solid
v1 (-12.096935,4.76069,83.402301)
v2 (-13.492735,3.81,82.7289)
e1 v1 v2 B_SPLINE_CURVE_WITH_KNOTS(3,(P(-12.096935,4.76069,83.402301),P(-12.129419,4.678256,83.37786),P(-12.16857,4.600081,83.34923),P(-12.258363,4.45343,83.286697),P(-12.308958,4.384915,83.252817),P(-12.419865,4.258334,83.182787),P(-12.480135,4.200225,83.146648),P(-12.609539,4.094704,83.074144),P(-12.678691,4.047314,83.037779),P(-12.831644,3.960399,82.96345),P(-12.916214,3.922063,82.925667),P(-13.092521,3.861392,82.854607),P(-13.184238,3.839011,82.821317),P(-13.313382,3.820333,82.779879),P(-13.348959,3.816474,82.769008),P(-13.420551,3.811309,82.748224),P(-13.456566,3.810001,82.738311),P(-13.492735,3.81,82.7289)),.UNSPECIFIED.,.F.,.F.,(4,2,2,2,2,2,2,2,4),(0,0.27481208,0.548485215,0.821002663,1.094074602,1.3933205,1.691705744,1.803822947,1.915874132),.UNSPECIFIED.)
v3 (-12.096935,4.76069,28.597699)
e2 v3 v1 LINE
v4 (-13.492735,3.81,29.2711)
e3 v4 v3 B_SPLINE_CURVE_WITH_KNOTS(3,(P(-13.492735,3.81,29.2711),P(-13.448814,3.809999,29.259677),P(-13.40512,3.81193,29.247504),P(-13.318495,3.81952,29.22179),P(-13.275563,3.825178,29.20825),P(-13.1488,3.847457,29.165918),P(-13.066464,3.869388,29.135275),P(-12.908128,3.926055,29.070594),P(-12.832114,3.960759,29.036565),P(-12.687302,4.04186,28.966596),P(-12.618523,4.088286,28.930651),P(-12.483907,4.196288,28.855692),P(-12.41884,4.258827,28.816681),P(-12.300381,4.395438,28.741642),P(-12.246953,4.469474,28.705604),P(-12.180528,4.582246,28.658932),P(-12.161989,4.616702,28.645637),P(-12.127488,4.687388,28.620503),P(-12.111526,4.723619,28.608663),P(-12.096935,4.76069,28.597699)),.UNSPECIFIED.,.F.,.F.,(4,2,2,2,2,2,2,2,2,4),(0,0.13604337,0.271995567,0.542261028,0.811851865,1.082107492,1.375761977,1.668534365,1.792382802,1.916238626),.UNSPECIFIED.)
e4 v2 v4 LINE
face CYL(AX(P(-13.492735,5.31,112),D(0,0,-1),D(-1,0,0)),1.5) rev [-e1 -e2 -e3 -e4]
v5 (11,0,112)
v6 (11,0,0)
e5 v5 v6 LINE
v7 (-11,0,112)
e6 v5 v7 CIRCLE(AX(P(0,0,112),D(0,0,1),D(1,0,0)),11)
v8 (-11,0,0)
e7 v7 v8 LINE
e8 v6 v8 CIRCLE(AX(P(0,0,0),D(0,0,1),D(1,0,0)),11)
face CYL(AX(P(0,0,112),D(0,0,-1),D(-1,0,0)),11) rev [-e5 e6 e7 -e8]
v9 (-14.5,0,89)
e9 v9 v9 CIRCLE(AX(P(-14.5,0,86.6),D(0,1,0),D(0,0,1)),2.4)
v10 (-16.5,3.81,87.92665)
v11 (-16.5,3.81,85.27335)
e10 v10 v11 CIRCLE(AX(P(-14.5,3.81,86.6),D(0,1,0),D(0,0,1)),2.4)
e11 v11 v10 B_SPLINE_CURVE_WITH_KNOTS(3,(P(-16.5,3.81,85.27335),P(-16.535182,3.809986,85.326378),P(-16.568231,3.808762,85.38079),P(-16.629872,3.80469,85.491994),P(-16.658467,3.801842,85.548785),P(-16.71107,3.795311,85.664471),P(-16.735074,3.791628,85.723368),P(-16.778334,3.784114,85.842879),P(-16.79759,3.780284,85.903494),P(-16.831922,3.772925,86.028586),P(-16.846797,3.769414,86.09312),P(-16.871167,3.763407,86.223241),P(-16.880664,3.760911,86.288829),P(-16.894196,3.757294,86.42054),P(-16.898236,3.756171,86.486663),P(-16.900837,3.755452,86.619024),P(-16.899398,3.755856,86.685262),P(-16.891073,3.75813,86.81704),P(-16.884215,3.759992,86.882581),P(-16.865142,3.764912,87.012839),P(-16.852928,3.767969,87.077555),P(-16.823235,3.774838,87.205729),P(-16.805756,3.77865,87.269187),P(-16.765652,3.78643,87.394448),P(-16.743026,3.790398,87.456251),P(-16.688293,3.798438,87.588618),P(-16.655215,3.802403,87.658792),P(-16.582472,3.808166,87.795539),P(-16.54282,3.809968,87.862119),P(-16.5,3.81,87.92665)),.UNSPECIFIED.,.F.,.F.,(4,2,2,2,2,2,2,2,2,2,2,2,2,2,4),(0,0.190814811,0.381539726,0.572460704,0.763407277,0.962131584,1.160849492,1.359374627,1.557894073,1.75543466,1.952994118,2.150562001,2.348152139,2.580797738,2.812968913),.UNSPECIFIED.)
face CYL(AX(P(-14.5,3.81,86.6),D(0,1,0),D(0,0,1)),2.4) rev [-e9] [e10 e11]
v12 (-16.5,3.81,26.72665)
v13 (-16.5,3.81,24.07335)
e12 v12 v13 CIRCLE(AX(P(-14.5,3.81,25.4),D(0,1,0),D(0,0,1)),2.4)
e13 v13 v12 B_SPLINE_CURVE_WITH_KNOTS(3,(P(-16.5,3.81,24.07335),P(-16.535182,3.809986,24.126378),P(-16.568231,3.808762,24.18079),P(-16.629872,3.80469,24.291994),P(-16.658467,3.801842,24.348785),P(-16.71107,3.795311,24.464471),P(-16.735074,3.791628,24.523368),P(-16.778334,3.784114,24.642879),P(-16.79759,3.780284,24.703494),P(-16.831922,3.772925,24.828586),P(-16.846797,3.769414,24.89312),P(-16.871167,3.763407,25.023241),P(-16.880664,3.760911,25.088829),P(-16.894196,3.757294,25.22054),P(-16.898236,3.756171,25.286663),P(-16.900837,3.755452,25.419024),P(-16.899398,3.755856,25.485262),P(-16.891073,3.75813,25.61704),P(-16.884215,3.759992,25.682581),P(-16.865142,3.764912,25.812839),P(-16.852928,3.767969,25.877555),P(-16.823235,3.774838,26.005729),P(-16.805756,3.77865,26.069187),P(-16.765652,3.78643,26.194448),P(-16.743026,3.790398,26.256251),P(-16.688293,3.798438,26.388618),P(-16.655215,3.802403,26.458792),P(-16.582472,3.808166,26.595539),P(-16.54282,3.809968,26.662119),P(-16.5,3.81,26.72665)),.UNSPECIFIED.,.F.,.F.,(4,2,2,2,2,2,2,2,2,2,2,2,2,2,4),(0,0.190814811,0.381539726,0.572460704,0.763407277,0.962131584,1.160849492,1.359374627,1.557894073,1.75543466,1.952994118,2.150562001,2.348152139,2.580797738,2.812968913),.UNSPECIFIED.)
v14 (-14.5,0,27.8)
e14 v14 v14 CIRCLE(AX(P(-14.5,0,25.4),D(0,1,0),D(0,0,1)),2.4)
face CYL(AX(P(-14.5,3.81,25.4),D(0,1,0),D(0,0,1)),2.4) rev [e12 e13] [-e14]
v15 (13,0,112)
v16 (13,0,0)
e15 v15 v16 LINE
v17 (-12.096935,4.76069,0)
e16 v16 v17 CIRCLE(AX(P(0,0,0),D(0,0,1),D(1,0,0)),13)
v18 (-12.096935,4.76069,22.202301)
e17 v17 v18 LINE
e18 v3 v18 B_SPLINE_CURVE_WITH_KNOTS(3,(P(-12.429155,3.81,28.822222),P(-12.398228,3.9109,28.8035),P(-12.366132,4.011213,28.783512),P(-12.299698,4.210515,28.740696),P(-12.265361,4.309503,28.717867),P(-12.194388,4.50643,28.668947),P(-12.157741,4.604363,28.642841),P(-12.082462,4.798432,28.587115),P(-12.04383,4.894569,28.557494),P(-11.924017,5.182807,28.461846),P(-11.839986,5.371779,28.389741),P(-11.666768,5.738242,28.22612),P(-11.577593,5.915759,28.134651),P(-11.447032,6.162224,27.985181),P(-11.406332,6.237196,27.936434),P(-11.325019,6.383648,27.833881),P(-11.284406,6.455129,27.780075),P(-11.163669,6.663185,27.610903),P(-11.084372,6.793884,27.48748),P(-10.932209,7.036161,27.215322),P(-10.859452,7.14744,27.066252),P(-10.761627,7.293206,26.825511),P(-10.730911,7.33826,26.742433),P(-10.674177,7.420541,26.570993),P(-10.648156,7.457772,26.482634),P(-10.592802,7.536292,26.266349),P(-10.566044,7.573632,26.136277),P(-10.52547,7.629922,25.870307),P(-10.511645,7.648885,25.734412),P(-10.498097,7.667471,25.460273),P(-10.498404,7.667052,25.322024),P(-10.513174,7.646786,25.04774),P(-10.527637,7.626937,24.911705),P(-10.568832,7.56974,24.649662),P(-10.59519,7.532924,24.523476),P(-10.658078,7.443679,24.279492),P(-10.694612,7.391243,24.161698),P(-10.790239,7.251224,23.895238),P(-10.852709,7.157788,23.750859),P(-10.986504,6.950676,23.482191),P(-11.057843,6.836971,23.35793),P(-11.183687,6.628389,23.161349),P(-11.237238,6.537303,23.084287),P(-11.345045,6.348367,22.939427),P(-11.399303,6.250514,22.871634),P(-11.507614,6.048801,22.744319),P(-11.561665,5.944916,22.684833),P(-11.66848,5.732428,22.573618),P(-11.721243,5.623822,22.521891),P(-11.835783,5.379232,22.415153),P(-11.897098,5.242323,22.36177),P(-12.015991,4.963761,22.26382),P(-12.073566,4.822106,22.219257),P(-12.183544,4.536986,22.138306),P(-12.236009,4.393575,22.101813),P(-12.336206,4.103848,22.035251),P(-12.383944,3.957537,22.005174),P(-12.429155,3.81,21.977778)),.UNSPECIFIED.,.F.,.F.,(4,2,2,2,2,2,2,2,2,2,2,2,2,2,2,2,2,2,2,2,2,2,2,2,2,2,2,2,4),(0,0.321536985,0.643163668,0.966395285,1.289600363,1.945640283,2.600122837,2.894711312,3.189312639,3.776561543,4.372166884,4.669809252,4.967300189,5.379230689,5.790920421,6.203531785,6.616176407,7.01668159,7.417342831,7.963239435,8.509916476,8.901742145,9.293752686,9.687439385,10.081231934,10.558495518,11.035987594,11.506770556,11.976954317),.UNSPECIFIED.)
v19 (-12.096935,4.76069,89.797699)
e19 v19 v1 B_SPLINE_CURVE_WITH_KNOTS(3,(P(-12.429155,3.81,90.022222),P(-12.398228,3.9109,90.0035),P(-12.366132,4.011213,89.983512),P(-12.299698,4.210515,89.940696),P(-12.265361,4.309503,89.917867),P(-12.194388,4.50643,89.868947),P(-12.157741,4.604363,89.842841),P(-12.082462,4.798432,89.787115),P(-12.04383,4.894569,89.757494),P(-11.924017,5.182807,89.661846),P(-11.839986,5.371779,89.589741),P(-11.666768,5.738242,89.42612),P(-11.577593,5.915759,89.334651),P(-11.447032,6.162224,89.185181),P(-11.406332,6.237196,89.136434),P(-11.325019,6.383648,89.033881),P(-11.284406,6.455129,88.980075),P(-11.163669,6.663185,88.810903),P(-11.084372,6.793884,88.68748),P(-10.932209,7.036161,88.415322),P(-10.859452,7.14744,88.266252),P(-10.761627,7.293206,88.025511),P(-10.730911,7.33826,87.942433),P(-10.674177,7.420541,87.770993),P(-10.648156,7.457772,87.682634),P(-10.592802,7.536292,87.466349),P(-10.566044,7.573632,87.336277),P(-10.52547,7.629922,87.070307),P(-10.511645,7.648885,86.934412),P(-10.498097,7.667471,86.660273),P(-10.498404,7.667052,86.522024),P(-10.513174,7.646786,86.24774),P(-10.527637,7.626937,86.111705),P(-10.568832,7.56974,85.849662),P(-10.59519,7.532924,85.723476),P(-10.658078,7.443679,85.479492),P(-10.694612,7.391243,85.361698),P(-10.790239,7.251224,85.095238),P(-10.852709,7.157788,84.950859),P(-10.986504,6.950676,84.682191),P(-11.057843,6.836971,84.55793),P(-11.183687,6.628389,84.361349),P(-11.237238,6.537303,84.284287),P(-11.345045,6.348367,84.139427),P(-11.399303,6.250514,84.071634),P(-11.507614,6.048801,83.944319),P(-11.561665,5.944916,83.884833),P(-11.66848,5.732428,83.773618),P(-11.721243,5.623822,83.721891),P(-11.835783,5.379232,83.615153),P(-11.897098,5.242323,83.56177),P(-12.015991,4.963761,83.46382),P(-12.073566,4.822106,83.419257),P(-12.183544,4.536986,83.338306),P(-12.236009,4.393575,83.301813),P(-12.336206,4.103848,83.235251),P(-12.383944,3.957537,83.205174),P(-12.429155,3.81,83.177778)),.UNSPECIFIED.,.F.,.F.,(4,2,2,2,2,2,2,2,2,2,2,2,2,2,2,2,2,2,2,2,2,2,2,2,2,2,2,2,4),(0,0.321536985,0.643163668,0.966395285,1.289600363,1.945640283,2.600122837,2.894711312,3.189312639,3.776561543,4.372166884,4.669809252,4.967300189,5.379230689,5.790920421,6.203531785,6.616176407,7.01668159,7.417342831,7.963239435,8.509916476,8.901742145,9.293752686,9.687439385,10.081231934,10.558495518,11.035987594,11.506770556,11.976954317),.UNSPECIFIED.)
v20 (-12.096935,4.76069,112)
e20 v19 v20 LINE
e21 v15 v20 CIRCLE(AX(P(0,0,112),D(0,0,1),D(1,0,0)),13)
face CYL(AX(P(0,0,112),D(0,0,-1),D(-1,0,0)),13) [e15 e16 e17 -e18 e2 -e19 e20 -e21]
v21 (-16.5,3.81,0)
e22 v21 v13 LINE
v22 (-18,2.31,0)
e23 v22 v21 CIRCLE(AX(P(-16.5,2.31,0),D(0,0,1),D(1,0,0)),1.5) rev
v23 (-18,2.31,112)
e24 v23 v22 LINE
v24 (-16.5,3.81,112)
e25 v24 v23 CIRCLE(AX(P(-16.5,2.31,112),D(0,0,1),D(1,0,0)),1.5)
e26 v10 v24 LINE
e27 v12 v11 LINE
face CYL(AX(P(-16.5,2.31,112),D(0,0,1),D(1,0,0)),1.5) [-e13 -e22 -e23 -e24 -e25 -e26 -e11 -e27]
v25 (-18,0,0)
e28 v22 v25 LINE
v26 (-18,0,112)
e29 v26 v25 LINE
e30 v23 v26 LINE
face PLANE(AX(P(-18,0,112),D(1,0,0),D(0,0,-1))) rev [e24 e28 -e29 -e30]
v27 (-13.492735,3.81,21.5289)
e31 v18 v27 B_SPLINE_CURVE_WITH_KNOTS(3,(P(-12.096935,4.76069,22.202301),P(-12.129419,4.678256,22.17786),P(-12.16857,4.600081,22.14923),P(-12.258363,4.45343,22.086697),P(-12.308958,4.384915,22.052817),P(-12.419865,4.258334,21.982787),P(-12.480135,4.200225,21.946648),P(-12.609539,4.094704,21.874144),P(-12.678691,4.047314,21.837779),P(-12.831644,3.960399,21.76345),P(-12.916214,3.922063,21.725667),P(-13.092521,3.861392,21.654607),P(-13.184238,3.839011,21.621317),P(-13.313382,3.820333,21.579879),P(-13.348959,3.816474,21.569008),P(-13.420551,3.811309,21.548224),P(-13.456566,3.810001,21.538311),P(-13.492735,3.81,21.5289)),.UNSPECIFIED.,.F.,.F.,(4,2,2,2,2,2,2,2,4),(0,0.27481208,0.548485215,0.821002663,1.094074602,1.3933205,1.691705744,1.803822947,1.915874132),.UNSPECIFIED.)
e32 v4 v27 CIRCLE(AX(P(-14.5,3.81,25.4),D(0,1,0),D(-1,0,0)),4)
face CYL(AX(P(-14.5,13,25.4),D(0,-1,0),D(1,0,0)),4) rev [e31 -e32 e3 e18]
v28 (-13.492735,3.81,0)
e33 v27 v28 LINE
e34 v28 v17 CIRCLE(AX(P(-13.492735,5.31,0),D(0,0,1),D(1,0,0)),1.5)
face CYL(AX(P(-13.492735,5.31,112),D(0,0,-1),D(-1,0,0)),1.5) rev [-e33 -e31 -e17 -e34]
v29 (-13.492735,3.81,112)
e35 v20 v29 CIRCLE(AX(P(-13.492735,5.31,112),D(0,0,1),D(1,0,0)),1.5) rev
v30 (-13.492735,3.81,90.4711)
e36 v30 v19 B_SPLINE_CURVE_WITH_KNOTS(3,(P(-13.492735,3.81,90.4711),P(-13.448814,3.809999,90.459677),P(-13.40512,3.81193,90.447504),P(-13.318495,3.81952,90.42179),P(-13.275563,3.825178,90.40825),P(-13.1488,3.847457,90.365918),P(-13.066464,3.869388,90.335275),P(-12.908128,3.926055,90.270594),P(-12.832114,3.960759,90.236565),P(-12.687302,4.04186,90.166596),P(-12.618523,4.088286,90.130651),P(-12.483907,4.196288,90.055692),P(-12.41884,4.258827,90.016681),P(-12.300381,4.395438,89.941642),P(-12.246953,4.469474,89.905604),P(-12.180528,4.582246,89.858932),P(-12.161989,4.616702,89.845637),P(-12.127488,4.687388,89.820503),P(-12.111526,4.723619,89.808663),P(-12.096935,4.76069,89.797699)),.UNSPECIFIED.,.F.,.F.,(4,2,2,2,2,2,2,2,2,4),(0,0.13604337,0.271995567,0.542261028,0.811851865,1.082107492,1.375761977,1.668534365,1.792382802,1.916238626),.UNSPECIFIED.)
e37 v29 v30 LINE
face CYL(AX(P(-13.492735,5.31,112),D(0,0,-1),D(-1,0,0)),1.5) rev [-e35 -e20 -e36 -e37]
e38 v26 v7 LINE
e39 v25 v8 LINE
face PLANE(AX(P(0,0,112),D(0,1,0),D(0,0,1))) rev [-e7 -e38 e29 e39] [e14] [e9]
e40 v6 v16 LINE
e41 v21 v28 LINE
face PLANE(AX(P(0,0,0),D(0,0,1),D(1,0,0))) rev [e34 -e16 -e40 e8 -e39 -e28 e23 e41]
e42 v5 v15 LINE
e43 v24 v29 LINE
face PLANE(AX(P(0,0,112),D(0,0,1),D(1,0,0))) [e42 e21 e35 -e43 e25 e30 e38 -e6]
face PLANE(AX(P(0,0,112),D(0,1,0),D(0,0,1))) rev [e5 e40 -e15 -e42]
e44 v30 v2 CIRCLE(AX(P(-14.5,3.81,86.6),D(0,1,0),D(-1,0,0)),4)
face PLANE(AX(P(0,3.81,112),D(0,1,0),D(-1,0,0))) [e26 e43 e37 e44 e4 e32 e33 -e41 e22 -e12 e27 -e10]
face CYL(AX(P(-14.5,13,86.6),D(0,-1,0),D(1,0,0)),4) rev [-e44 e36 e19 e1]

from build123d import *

# Parameters (mm, degrees)
BOSS_EXTRUDE1_DEPTH           = 112
SKETCH6_W                     = 2.4
SKETCH6_H                     = 3.81
M4_CLEARANCE_HOLE2_AT_2_COUNT = 2
M4_CLEARANCE_HOLE2_AT_2_PITCH = 61.2
SKETCH7_R                     = 4
CUT_EXTRUDE1_DEPTH            = 114.80885774
FILLET1_R                     = 1.5


with BuildPart() as part:
    # Sketch1 → Boss-Extrude1 (new body)
    with BuildSketch(Plane.XY):
        with BuildLine():
            ThreePointArc((-12.429155241, 3.81), (-12.856496765, 1.926263465), (-13, 0))
            Line((-13, 0), (-11, 0))
            ThreePointArc((-11, 0), (0, 11), (11, 0))
            Line((11, 0), (13, 0))
            ThreePointArc((13, 0), (9.192388155, 9.192388155), (0, 13))
            ThreePointArc((0, 13), (-7.728842087, 10.452990003), (-12.429155241, 3.81))
        make_face()
        with BuildLine():
            Line((-18, 0), (-13, 0))
            ThreePointArc((-13, 0), (-12.856496765, 1.926263465), (-12.429155241, 3.81))
            Line((-12.429155241, 3.81), (-18, 3.81))
            Line((-18, 3.81), (-18, 0))
        make_face()
    extrude(amount=BOSS_EXTRUDE1_DEPTH)

    # Sketch6 → M4 Clearance Hole2 (revolve, cut)
    with BuildSketch(Plane(origin=(-14.5, 3.81, 86.6), x_dir=(0, 0, 1), z_dir=(1, 0, 0))):
        with Locations((1.2, 1.905)):
            Rectangle(SKETCH6_W, SKETCH6_H)
    m4_clearance_hole2 = revolve(axis=Axis((-14.5, 10.16, 86.6), (0, -1, 0)), mode=Mode.SUBTRACT)

    # M4 Clearance Hole2 at 2: M4 Clearance Hole2 ×2
    with Locations(*[(0, 0, -i * M4_CLEARANCE_HOLE2_AT_2_PITCH) for i in range(1, M4_CLEARANCE_HOLE2_AT_2_COUNT)]):
        add(m4_clearance_hole2, mode=Mode.SUBTRACT)

    # Sketch7 → Cut-Extrude1 (cut, through all)
    with BuildSketch(Plane(origin=(0, 3.81, 0), x_dir=(1, 0, 0), z_dir=(0, 1, 0))):
        with Locations((-14.5, -25.4)):
            Circle(SKETCH7_R)
        with Locations((-14.5, -86.6)):
            Circle(SKETCH7_R)
    extrude(amount=CUT_EXTRUDE1_DEPTH, mode=Mode.SUBTRACT)

    # Fillet1
    # the kernel refuses this fillet: 1.5 mm, written as the material it adds along each edge
    with BuildSketch(Plane(origin=(-12.429155241, 3.81, 87.363272187), x_dir=(0.32988946400333646, 0.9440195662906523, 0), z_dir=(0, 0, 1))) as fillet1_piece_1_section:
        with BuildLine():
            CenterArc((1.065165566, 1.498874377), FILLET1_R, 199.262066546, 68.518123934)
            Line((-0.350863784, 1.004040181), (0, 0))
            ThreePointArc((0, 0), (0.503532813, 0.009755402), (1.007065626, 0))
        make_face()
    fillet1_piece_1 = extrude(amount=24.636727813, mode=Mode.PRIVATE)
    fillet1_piece_1 = fillet1_piece_1 - Plane(origin=(-14.5, 4.019727469, 86.6), x_dir=(1, 0, 0), z_dir=(0, -1, 0)) * Cylinder(4, 54, mode=Mode.PRIVATE)
    add(fillet1_piece_1)
    with BuildSketch(Plane(origin=(-12.429155241, 3.81, 26.163272187), x_dir=(0.32988946400333646, 0.9440195662906523, 0), z_dir=(0, 0, 1))) as fillet1_piece_2_section:
        with BuildLine():
            CenterArc((1.065165566, 1.498874377), FILLET1_R, 199.262066546, 68.518123934)
            Line((-0.350863784, 1.004040181), (0, 0))
            ThreePointArc((0, 0), (0.503532813, 0.009755402), (1.007065626, 0))
        make_face()
    fillet1_piece_2 = extrude(amount=59.673455626, mode=Mode.PRIVATE)
    fillet1_piece_2 = fillet1_piece_2 - Plane(origin=(-14.5, 4.019506005, 86.6), x_dir=(1, 0, 0), z_dir=(0, -1, 0)) * Cylinder(4, 124, mode=Mode.PRIVATE)
    fillet1_piece_2 = fillet1_piece_2 - Plane(origin=(-14.5, 4.019506005, 25.4), x_dir=(1, 0, 0), z_dir=(0, -1, 0)) * Cylinder(4, 124, mode=Mode.PRIVATE)
    add(fillet1_piece_2)
    with BuildSketch(Plane(origin=(-12.429155241, 3.81, 0), x_dir=(0.3298894640033357, 0.9440195662906526, 0), z_dir=(0, 0, 1))) as fillet1_piece_3_section:
        with BuildLine():
            CenterArc((1.065165566, 1.498874377), FILLET1_R, 199.262066546, 68.518123934)
            Line((-0.350863784, 1.004040181), (0, 0))
            ThreePointArc((0, 0), (0.503532813, 0.009755402), (1.007065626, 0))
        make_face()
    fillet1_piece_3 = extrude(amount=24.636727813, mode=Mode.PRIVATE)
    fillet1_piece_3 = fillet1_piece_3 - Plane(origin=(-14.5, 4.019727315, 25.4), x_dir=(1, 0, 0), z_dir=(0, -1, 0)) * Cylinder(4, 54, mode=Mode.PRIVATE)
    add(fillet1_piece_3)
    # the kernel refuses this fillet: 1.5 mm, written as the material it takes off along each edge
    with BuildSketch(Plane(origin=(-18, 3.81, -3.75), x_dir=(1, 0, 0), z_dir=(0, 0, 1))) as fillet1_2_piece_1:
        with BuildLine():
            CenterArc((FILLET1_R, -FILLET1_R), FILLET1_R, 90, 90)
            Line((0, -FILLET1_R), (0, 0))
            Line((0, 0), (FILLET1_R, 0))
        make_face()
    extrude(amount=119.5, mode=Mode.SUBTRACT)


solid = part.part
